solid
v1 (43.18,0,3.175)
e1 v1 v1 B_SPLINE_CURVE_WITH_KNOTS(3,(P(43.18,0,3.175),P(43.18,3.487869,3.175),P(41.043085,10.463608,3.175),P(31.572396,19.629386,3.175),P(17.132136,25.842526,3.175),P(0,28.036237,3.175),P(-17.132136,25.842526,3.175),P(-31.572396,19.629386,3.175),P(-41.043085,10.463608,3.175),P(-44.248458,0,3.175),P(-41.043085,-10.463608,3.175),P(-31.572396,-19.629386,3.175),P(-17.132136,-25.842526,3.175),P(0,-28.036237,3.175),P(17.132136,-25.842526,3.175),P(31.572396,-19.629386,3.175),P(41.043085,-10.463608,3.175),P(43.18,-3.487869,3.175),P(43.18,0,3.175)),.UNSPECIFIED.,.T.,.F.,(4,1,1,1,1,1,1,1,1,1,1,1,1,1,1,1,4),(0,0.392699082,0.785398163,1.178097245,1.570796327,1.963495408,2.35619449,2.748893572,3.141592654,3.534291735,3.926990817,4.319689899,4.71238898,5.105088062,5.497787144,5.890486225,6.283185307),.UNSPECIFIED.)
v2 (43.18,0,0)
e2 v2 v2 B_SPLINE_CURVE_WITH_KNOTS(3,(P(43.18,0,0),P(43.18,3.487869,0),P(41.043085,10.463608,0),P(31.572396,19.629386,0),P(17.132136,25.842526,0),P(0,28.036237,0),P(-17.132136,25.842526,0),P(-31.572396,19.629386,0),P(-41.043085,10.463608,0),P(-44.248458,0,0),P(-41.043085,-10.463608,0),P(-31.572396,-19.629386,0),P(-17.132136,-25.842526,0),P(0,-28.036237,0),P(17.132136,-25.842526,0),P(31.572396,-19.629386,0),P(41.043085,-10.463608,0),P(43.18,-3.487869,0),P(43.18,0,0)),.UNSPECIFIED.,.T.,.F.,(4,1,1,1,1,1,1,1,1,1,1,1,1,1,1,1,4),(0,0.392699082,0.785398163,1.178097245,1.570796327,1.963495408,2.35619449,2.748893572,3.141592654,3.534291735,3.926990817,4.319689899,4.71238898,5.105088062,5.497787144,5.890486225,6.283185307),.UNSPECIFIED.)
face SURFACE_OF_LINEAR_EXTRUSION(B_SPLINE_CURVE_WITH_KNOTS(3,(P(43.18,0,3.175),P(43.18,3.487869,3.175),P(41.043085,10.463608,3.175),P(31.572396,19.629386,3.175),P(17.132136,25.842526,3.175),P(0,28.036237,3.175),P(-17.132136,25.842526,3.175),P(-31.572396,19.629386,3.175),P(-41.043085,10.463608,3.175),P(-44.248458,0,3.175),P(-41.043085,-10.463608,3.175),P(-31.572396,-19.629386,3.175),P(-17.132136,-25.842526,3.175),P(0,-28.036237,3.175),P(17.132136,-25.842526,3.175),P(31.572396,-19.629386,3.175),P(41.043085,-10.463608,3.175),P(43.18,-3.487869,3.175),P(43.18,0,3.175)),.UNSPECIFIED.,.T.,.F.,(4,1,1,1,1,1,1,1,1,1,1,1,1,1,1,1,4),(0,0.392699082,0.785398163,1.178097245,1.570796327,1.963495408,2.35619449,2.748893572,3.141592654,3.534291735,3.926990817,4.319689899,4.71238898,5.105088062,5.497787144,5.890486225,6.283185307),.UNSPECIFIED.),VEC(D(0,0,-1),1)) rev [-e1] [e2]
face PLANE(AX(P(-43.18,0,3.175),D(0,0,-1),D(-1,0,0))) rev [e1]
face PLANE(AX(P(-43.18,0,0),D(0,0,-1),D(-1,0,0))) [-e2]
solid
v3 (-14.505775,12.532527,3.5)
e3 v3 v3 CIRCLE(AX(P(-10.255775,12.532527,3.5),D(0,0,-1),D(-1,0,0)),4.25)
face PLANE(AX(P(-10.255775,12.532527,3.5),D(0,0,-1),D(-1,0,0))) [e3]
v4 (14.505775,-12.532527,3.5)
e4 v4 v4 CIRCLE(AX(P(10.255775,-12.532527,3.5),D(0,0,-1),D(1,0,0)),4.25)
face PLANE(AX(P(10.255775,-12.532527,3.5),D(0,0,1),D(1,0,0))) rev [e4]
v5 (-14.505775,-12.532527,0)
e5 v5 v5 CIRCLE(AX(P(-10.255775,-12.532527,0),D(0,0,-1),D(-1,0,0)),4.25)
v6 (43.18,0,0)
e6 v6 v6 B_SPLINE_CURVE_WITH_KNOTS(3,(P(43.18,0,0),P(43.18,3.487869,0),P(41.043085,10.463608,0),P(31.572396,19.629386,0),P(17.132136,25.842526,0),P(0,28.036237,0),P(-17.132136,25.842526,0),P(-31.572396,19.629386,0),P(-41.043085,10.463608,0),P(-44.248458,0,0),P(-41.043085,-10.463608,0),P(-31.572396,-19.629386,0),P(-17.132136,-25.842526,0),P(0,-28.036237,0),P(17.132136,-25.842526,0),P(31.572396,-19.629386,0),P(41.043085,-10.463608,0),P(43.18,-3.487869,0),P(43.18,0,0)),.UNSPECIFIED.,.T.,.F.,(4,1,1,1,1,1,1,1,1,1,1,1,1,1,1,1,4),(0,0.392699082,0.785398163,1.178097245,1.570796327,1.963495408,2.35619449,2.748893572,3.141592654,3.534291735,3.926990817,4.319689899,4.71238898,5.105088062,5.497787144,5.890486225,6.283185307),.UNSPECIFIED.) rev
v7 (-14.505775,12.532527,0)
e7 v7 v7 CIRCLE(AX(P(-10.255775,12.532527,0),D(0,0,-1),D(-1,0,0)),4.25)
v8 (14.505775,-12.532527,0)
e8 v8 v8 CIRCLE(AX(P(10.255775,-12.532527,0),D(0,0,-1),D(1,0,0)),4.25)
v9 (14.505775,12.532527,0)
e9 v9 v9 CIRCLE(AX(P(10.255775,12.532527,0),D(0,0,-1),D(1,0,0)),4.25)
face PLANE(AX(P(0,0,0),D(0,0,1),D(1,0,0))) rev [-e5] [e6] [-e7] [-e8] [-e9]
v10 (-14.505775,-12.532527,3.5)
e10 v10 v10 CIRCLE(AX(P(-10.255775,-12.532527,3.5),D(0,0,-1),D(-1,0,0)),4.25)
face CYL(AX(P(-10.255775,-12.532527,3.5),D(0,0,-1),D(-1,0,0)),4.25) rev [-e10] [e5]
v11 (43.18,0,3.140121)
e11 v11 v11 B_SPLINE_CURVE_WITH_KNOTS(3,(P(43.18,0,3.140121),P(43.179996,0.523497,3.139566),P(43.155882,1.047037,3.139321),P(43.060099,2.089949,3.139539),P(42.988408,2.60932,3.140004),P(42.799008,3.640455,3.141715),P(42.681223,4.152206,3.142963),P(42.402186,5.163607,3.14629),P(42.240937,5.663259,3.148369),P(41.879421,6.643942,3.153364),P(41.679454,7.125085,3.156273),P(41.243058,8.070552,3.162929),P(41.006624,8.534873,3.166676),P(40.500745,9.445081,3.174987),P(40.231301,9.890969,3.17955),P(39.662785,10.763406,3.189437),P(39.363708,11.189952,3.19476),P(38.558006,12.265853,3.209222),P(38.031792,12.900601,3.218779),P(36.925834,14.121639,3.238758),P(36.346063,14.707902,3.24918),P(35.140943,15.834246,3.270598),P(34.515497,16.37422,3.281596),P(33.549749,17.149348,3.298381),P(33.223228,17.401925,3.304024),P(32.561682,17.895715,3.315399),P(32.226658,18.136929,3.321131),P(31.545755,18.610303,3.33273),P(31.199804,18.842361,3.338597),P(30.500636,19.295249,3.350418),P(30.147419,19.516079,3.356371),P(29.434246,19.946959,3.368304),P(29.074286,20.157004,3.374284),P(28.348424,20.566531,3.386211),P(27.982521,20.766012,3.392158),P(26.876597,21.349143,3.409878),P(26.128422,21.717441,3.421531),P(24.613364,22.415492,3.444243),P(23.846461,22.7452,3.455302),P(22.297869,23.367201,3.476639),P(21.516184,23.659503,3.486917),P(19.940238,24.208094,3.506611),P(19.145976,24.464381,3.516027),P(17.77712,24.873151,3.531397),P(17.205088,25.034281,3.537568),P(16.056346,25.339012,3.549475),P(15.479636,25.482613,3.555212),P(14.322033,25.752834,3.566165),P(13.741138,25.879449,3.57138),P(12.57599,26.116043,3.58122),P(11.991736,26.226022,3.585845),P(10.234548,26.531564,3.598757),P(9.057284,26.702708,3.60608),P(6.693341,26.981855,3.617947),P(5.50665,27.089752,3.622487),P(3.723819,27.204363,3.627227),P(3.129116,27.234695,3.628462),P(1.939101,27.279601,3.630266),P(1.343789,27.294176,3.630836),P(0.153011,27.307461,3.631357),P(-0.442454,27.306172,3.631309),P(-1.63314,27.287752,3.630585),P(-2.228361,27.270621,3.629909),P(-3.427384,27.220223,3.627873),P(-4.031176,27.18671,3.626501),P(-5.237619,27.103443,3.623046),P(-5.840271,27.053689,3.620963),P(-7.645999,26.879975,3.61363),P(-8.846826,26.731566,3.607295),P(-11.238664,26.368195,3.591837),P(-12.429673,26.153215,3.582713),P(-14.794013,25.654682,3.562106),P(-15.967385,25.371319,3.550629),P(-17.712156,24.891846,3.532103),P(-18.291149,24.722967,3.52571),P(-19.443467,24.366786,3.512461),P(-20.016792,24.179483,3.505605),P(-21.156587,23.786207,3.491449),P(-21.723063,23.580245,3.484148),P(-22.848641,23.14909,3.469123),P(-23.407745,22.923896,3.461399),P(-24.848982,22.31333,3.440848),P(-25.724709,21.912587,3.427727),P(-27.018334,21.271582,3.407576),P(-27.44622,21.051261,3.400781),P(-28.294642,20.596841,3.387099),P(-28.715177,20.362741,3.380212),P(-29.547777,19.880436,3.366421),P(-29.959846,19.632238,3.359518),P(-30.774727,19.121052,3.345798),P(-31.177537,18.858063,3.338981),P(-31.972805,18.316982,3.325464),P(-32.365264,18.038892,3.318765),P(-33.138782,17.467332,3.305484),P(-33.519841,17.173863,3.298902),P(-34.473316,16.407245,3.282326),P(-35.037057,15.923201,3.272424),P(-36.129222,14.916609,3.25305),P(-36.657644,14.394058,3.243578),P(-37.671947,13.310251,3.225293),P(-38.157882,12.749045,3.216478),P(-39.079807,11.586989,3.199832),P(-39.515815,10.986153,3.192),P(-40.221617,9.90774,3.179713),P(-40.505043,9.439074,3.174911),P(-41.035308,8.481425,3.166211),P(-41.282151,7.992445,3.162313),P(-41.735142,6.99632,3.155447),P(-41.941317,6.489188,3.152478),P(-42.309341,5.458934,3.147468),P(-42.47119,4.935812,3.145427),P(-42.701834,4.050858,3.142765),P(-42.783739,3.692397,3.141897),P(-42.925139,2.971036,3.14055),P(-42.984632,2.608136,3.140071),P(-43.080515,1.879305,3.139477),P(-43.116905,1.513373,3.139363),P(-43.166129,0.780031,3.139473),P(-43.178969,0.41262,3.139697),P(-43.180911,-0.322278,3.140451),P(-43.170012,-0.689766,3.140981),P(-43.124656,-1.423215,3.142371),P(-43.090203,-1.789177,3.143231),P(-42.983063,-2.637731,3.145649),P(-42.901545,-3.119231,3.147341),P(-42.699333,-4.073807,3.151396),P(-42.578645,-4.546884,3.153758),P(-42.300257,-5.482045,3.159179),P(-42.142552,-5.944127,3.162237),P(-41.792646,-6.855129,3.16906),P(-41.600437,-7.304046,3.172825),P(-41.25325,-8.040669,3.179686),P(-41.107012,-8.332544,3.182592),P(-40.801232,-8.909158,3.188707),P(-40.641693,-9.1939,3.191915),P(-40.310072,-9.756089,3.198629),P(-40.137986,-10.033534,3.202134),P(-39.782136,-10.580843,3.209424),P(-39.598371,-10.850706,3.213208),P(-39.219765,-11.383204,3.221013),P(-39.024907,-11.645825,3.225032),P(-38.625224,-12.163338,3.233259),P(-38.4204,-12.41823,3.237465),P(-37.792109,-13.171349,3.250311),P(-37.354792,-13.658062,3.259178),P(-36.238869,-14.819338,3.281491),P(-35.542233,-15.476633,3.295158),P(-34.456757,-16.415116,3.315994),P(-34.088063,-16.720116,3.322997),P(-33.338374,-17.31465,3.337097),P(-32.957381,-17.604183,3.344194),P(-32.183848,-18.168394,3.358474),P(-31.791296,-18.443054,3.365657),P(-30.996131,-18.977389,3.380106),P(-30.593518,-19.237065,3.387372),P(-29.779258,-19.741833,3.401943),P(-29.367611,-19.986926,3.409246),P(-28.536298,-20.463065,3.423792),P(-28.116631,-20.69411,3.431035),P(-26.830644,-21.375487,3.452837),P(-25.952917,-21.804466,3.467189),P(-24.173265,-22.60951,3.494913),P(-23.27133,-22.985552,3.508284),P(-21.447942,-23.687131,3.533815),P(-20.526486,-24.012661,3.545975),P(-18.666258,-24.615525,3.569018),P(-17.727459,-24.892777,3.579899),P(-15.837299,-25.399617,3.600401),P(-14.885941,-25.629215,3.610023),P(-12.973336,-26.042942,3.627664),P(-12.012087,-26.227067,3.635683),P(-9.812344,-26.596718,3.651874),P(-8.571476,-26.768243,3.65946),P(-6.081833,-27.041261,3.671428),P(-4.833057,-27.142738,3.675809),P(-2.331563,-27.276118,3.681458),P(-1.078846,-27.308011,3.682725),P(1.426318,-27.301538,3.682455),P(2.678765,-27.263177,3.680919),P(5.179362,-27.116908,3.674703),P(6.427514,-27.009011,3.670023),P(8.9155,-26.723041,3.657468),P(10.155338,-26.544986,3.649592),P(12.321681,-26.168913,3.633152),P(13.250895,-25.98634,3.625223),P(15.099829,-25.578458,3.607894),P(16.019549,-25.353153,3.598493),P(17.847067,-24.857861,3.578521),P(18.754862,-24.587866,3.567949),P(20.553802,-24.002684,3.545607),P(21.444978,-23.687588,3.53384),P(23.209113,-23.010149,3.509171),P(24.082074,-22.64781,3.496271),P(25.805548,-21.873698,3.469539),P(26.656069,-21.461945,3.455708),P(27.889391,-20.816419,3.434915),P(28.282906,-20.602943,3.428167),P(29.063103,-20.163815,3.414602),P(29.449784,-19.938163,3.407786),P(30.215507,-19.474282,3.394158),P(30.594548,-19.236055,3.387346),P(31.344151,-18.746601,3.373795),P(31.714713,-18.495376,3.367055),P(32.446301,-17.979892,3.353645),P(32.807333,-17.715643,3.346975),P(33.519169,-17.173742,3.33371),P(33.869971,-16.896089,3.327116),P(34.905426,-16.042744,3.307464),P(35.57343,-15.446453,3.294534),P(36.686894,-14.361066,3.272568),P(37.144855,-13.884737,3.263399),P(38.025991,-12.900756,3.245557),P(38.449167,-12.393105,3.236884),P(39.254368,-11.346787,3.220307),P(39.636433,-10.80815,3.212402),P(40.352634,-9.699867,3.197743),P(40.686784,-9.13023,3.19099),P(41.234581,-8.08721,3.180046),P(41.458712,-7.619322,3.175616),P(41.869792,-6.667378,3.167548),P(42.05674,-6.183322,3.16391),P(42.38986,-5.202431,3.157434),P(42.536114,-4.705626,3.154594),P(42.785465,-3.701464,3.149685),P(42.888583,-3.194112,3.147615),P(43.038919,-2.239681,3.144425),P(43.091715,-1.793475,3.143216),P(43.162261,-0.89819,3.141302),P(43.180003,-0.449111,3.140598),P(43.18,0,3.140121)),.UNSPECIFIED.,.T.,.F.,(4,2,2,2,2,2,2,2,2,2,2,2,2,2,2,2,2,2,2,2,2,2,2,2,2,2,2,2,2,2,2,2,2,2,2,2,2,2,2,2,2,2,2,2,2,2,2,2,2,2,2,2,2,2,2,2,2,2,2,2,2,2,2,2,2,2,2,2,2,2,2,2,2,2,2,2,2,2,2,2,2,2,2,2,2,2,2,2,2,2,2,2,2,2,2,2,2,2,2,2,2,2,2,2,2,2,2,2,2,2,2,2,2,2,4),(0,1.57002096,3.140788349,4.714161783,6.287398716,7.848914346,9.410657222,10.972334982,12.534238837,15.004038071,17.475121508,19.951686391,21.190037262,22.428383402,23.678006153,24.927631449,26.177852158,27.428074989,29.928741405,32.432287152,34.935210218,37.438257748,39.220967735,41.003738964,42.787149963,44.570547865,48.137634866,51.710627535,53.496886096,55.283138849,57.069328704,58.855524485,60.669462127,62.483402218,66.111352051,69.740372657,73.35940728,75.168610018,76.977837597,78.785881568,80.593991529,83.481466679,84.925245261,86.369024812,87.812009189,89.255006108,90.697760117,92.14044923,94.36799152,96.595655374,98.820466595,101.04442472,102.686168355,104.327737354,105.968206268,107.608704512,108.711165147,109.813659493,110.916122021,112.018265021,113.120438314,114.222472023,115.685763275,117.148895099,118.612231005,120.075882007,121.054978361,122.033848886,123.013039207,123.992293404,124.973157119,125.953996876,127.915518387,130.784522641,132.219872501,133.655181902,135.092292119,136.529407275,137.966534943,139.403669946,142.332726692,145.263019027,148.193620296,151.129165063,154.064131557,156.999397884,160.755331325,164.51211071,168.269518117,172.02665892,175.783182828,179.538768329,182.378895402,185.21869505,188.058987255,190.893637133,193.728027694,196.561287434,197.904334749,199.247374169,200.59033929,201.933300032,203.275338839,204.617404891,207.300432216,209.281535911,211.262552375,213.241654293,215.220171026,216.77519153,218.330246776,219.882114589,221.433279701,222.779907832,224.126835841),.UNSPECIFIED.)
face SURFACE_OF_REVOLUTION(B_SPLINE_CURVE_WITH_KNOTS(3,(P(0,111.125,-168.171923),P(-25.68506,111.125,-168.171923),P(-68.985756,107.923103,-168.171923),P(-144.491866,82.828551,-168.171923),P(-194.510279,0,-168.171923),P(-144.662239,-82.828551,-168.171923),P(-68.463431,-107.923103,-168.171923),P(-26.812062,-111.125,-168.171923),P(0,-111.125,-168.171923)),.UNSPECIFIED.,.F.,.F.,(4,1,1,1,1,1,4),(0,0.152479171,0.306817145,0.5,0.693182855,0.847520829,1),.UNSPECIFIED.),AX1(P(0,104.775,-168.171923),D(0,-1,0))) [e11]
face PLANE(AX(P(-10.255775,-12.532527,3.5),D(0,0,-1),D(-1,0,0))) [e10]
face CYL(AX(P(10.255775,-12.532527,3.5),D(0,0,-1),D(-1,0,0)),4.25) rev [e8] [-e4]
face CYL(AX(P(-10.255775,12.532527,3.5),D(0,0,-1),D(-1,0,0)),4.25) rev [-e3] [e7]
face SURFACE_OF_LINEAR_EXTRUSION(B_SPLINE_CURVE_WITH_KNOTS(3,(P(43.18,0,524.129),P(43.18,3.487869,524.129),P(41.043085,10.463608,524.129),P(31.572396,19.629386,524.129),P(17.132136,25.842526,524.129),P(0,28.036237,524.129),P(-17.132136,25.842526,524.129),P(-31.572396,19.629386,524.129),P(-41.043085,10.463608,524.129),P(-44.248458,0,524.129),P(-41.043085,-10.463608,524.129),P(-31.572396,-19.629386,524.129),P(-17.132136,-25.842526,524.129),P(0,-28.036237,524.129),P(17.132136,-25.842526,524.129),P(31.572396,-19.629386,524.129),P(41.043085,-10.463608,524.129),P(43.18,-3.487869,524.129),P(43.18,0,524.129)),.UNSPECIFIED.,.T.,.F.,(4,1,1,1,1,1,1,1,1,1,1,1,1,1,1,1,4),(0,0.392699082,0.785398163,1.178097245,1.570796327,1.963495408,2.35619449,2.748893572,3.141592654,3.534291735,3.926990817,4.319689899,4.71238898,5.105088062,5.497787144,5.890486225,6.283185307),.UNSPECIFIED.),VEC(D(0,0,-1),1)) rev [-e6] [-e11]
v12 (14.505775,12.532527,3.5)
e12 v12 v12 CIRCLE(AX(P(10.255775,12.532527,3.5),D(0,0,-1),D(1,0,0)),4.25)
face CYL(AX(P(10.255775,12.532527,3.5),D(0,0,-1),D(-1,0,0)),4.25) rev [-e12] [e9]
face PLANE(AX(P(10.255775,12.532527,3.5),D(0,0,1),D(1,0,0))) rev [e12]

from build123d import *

# Parameters (mm, degrees)
BOSS_EXTRUDE1_DEPTH     = 3.175
SKETCH3_R               = 210.872545424
CUT_EXTRUDE1_DEPTH      = 524.129
CUT_EXTRUDE2_DEPTH      = 524.129
CUT_EXTRUDE2_DEPTH_BACK = 524.129
SKETCH4_R               = 61.79011218
BOSS_EXTRUDE2_REACH     = 53.791
SKETCH6_R               = 4.25
CUT_EXTRUDE3_DEPTH      = 3.5


# Read off the part's stored shape, not the designer's step: Boss-Extrude1
with BuildPart() as part:
    # Boss-Extrude1 outline → Boss-Extrude1 (new body)
    with BuildSketch(Plane.XY):
        with BuildLine():
            add(Edge.make_bspline(
                [(43.18, 0), (43.18, 3.487869372), (41.04308468, 10.463608115), (31.572396318, 19.629385836), (17.132135744, 25.842526194), (0, 28.036236903), (-17.132135744, 25.842526194), (-31.572396318, 19.629385836), (-41.04308468, 10.463608115), (-44.24845766, 0), (-41.04308468, -10.463608115), (-31.572396318, -19.629385836), (-17.132135744, -25.842526194), (0, -28.036236903), (17.132135744, -25.842526194), (31.572396318, -19.629385836), (41.04308468, -10.463608115), (43.18, -3.487869372), (43.18, 0)],
                knots=[0, 0, 0, 0, 0.392699082, 0.785398163, 1.178097245, 1.570796327, 1.963495408, 2.35619449, 2.748893572, 3.141592654, 3.534291735, 3.926990817, 4.319689899, 4.71238898, 5.105088062, 5.497787144, 5.890486225, 6.283185307, 6.283185307, 6.283185307, 6.283185307], degree=3))
        make_face()
    extrude(amount=BOSS_EXTRUDE1_DEPTH)


with BuildPart() as body_2:
    # Sketch2 → Revolve1 (revolve)
    with BuildSketch(Plane.XY.offset(-168.171923244)):
        with BuildLine():
            Line((0, 104.775), (0, 111.125))
            add(Edge.make_bspline(
                [(0, 111.125), (-25.6850603, 111.125), (-68.985756192, 107.923102763), (-144.491866473, 82.828551423), (-194.510279111, 0), (-144.662239102, -82.828551423), (-68.463431094, -107.923102763), (-26.812062356, -111.125), (0, -111.125)],
                knots=[0, 0, 0, 0, 0.152479171, 0.306817145, 0.5, 0.693182855, 0.847520829, 1, 1, 1, 1], degree=3))
            Line((0, -111.125), (0, -104.775))
            add(Edge.make_bspline(
                [(0, -104.775), (-0.171719551, -104.775), (-0.339960895, -104.774935341), (-3.053437978, -104.772860622), (-8.190766555, -104.738608012), (-13.107715438, -104.636837025), (-20.568808866, -104.421053121), (-25.339746217, -104.199600548), (-39.238452343, -103.268644468), (-47.950847553, -102.293557604), (-58.827303545, -100.510941168), (-61.00197668, -100.126156808), (-65.367166047, -99.296750098), (-67.559783414, -98.851910173), (-74.171137403, -97.424254002), (-78.611523138, -96.347877617), (-91.895410377, -92.6549551), (-100.700061603, -89.573590942), (-113.299275818, -83.681916807), (-117.398007221, -81.506750773), (-123.333519574, -77.885436226), (-125.276645483, -76.618564852), (-129.082652994, -73.958072983), (-130.943992005, -72.564959693), (-140.052843424, -65.252894529), (-146.694022396, -58.318049468), (-157.867866053, -43.071658706), (-162.398838205, -34.762308754), (-167.071540269, -21.890519252), (-168.276136939, -17.532153192), (-169.902554344, -8.777109056), (-170.324615699, -4.380780105), (-170.315618169, 4.367718599), (-169.884501784, 8.76460805), (-168.240967164, 17.521562319), (-167.028311047, 21.881267793), (-162.335053285, 34.75759435), (-157.795184186, 43.0706108), (-146.626276987, 58.323260071), (-139.998893431, 65.260747179), (-130.930547188, 72.57433306), (-129.078580269, 73.967653828), (-125.293874883, 76.627906362), (-123.362505498, 77.894418251), (-117.463453676, 81.514258744), (-113.390619307, 83.687941868), (-100.856345038, 89.57533659), (-92.077733287, 92.654250235), (-78.738710637, 96.345156511), (-74.264296231, 97.421083231), (-67.570351392, 98.848272549), (-65.344328139, 99.293032902), (-60.903607466, 100.122635351), (-58.687172846, 100.507643111), (-47.596026304, 102.291635707), (-38.693445228, 103.268203901), (-20.105885244, 104.510223459), (-10.420601756, 104.775), (0, 104.775)],
                knots=[0, 0, 0, 0, 0.000976562, 0.000976562, 0.015625, 0.03125, 0.03125, 0.0625, 0.0625, 0.125, 0.125, 0.140625, 0.140625, 0.15625, 0.15625, 0.1875, 0.1875, 0.25, 0.25, 0.28125, 0.28125, 0.296875, 0.296875, 0.3125, 0.3125, 0.375, 0.375, 0.4375, 0.4375, 0.46875, 0.46875, 0.5, 0.5, 0.53125, 0.53125, 0.5625, 0.5625, 0.625, 0.625, 0.6875, 0.6875, 0.703125, 0.703125, 0.71875, 0.71875, 0.75, 0.75, 0.8125, 0.8125, 0.84375, 0.84375, 0.859375, 0.859375, 0.875, 0.875, 0.9375, 0.9375, 1, 1, 1, 1], degree=3))
        make_face()
    revolve(axis=Axis((0, 104.775, -168.171923244), (0, 1, 0)))

    # Sketch3 → Cut-Extrude1 (cut)
    with BuildSketch(Plane.XY):
        Circle(SKETCH3_R)
    extrude(amount=-CUT_EXTRUDE1_DEPTH, mode=Mode.SUBTRACT)

    # Sketch4 → Cut-Extrude2 (cut, two sides: drawn at the far end of the back side and taken through both)
    with BuildSketch(Plane.XY.offset(-CUT_EXTRUDE2_DEPTH_BACK)):
        Circle(SKETCH4_R)
        with BuildLine():
            add(Edge.make_bspline(
                [(43.18, 0), (43.18, 3.487869372), (41.04308468, 10.463608115), (31.572396318, 19.629385836), (17.132135744, 25.842526194), (0, 28.036236903), (-17.132135744, 25.842526194), (-31.572396318, 19.629385836), (-41.04308468, 10.463608115), (-44.24845766, 0), (-41.04308468, -10.463608115), (-31.572396318, -19.629385836), (-17.132135744, -25.842526194), (0, -28.036236903), (17.132135744, -25.842526194), (31.572396318, -19.629385836), (41.04308468, -10.463608115), (43.18, -3.487869372), (43.18, 0)],
                knots=[0, 0, 0, 0, 0.392699082, 0.785398163, 1.178097245, 1.570796327, 1.963495408, 2.35619449, 2.748893572, 3.141592654, 3.534291735, 3.926990817, 4.319689899, 4.71238898, 5.105088062, 5.497787144, 5.890486225, 6.283185307, 6.283185307, 6.283185307, 6.283185307], degree=3))
        make_face(mode=Mode.SUBTRACT)
    extrude(amount=CUT_EXTRUDE2_DEPTH + CUT_EXTRUDE2_DEPTH_BACK, mode=Mode.SUBTRACT)

    # Sketch5 → Boss-Extrude2 (add, up to next)
    with BuildSketch(Plane(origin=(0, 0, 0), x_dir=(-1, 0, 0), z_dir=(0, 0, -1)), mode=Mode.PRIVATE) as boss_extrude2_sk1:
        Polygon((0, 23.110638672), (-33.338053903, 9.22412145), (-31.871168281, -8.671883139), (-9.378922077, -22.265023236), (16.304185416, -20.159850491), (26.315294725, -12.583578131), (31.536274547, 5.533568798), (19.176451365, 17.732058057), align=None)
    boss_extrude2_tool1 = extrude(boss_extrude2_sk1.sketch, amount=-BOSS_EXTRUDE2_REACH, mode=Mode.PRIVATE) - body_2.part
    add(boss_extrude2_tool1.solids().sort_by_distance((0.704013, -0.268334, 0))[0])

    # Sketch6 → Cut-Extrude3 (cut)
    with BuildSketch(Plane(origin=(0, 0, 0), x_dir=(-1, 0, 0), z_dir=(0, 0, -1))):
        with Locations(Location((-10.255774877, -12.532527364, 0), (0, 0, 180))):
            Circle(SKETCH6_R)
        with Locations((10.255774877, 12.532527364)):
            Circle(SKETCH6_R)
        with Locations((10.255774877, -12.532527364)):
            Circle(SKETCH6_R)
        with Locations(Location((-10.255774877, 12.532527364, 0), (0, 0, 180))):
            Circle(SKETCH6_R)
    extrude(amount=-CUT_EXTRUDE3_DEPTH, mode=Mode.SUBTRACT)


solid = Compound([part.part, body_2.part])
